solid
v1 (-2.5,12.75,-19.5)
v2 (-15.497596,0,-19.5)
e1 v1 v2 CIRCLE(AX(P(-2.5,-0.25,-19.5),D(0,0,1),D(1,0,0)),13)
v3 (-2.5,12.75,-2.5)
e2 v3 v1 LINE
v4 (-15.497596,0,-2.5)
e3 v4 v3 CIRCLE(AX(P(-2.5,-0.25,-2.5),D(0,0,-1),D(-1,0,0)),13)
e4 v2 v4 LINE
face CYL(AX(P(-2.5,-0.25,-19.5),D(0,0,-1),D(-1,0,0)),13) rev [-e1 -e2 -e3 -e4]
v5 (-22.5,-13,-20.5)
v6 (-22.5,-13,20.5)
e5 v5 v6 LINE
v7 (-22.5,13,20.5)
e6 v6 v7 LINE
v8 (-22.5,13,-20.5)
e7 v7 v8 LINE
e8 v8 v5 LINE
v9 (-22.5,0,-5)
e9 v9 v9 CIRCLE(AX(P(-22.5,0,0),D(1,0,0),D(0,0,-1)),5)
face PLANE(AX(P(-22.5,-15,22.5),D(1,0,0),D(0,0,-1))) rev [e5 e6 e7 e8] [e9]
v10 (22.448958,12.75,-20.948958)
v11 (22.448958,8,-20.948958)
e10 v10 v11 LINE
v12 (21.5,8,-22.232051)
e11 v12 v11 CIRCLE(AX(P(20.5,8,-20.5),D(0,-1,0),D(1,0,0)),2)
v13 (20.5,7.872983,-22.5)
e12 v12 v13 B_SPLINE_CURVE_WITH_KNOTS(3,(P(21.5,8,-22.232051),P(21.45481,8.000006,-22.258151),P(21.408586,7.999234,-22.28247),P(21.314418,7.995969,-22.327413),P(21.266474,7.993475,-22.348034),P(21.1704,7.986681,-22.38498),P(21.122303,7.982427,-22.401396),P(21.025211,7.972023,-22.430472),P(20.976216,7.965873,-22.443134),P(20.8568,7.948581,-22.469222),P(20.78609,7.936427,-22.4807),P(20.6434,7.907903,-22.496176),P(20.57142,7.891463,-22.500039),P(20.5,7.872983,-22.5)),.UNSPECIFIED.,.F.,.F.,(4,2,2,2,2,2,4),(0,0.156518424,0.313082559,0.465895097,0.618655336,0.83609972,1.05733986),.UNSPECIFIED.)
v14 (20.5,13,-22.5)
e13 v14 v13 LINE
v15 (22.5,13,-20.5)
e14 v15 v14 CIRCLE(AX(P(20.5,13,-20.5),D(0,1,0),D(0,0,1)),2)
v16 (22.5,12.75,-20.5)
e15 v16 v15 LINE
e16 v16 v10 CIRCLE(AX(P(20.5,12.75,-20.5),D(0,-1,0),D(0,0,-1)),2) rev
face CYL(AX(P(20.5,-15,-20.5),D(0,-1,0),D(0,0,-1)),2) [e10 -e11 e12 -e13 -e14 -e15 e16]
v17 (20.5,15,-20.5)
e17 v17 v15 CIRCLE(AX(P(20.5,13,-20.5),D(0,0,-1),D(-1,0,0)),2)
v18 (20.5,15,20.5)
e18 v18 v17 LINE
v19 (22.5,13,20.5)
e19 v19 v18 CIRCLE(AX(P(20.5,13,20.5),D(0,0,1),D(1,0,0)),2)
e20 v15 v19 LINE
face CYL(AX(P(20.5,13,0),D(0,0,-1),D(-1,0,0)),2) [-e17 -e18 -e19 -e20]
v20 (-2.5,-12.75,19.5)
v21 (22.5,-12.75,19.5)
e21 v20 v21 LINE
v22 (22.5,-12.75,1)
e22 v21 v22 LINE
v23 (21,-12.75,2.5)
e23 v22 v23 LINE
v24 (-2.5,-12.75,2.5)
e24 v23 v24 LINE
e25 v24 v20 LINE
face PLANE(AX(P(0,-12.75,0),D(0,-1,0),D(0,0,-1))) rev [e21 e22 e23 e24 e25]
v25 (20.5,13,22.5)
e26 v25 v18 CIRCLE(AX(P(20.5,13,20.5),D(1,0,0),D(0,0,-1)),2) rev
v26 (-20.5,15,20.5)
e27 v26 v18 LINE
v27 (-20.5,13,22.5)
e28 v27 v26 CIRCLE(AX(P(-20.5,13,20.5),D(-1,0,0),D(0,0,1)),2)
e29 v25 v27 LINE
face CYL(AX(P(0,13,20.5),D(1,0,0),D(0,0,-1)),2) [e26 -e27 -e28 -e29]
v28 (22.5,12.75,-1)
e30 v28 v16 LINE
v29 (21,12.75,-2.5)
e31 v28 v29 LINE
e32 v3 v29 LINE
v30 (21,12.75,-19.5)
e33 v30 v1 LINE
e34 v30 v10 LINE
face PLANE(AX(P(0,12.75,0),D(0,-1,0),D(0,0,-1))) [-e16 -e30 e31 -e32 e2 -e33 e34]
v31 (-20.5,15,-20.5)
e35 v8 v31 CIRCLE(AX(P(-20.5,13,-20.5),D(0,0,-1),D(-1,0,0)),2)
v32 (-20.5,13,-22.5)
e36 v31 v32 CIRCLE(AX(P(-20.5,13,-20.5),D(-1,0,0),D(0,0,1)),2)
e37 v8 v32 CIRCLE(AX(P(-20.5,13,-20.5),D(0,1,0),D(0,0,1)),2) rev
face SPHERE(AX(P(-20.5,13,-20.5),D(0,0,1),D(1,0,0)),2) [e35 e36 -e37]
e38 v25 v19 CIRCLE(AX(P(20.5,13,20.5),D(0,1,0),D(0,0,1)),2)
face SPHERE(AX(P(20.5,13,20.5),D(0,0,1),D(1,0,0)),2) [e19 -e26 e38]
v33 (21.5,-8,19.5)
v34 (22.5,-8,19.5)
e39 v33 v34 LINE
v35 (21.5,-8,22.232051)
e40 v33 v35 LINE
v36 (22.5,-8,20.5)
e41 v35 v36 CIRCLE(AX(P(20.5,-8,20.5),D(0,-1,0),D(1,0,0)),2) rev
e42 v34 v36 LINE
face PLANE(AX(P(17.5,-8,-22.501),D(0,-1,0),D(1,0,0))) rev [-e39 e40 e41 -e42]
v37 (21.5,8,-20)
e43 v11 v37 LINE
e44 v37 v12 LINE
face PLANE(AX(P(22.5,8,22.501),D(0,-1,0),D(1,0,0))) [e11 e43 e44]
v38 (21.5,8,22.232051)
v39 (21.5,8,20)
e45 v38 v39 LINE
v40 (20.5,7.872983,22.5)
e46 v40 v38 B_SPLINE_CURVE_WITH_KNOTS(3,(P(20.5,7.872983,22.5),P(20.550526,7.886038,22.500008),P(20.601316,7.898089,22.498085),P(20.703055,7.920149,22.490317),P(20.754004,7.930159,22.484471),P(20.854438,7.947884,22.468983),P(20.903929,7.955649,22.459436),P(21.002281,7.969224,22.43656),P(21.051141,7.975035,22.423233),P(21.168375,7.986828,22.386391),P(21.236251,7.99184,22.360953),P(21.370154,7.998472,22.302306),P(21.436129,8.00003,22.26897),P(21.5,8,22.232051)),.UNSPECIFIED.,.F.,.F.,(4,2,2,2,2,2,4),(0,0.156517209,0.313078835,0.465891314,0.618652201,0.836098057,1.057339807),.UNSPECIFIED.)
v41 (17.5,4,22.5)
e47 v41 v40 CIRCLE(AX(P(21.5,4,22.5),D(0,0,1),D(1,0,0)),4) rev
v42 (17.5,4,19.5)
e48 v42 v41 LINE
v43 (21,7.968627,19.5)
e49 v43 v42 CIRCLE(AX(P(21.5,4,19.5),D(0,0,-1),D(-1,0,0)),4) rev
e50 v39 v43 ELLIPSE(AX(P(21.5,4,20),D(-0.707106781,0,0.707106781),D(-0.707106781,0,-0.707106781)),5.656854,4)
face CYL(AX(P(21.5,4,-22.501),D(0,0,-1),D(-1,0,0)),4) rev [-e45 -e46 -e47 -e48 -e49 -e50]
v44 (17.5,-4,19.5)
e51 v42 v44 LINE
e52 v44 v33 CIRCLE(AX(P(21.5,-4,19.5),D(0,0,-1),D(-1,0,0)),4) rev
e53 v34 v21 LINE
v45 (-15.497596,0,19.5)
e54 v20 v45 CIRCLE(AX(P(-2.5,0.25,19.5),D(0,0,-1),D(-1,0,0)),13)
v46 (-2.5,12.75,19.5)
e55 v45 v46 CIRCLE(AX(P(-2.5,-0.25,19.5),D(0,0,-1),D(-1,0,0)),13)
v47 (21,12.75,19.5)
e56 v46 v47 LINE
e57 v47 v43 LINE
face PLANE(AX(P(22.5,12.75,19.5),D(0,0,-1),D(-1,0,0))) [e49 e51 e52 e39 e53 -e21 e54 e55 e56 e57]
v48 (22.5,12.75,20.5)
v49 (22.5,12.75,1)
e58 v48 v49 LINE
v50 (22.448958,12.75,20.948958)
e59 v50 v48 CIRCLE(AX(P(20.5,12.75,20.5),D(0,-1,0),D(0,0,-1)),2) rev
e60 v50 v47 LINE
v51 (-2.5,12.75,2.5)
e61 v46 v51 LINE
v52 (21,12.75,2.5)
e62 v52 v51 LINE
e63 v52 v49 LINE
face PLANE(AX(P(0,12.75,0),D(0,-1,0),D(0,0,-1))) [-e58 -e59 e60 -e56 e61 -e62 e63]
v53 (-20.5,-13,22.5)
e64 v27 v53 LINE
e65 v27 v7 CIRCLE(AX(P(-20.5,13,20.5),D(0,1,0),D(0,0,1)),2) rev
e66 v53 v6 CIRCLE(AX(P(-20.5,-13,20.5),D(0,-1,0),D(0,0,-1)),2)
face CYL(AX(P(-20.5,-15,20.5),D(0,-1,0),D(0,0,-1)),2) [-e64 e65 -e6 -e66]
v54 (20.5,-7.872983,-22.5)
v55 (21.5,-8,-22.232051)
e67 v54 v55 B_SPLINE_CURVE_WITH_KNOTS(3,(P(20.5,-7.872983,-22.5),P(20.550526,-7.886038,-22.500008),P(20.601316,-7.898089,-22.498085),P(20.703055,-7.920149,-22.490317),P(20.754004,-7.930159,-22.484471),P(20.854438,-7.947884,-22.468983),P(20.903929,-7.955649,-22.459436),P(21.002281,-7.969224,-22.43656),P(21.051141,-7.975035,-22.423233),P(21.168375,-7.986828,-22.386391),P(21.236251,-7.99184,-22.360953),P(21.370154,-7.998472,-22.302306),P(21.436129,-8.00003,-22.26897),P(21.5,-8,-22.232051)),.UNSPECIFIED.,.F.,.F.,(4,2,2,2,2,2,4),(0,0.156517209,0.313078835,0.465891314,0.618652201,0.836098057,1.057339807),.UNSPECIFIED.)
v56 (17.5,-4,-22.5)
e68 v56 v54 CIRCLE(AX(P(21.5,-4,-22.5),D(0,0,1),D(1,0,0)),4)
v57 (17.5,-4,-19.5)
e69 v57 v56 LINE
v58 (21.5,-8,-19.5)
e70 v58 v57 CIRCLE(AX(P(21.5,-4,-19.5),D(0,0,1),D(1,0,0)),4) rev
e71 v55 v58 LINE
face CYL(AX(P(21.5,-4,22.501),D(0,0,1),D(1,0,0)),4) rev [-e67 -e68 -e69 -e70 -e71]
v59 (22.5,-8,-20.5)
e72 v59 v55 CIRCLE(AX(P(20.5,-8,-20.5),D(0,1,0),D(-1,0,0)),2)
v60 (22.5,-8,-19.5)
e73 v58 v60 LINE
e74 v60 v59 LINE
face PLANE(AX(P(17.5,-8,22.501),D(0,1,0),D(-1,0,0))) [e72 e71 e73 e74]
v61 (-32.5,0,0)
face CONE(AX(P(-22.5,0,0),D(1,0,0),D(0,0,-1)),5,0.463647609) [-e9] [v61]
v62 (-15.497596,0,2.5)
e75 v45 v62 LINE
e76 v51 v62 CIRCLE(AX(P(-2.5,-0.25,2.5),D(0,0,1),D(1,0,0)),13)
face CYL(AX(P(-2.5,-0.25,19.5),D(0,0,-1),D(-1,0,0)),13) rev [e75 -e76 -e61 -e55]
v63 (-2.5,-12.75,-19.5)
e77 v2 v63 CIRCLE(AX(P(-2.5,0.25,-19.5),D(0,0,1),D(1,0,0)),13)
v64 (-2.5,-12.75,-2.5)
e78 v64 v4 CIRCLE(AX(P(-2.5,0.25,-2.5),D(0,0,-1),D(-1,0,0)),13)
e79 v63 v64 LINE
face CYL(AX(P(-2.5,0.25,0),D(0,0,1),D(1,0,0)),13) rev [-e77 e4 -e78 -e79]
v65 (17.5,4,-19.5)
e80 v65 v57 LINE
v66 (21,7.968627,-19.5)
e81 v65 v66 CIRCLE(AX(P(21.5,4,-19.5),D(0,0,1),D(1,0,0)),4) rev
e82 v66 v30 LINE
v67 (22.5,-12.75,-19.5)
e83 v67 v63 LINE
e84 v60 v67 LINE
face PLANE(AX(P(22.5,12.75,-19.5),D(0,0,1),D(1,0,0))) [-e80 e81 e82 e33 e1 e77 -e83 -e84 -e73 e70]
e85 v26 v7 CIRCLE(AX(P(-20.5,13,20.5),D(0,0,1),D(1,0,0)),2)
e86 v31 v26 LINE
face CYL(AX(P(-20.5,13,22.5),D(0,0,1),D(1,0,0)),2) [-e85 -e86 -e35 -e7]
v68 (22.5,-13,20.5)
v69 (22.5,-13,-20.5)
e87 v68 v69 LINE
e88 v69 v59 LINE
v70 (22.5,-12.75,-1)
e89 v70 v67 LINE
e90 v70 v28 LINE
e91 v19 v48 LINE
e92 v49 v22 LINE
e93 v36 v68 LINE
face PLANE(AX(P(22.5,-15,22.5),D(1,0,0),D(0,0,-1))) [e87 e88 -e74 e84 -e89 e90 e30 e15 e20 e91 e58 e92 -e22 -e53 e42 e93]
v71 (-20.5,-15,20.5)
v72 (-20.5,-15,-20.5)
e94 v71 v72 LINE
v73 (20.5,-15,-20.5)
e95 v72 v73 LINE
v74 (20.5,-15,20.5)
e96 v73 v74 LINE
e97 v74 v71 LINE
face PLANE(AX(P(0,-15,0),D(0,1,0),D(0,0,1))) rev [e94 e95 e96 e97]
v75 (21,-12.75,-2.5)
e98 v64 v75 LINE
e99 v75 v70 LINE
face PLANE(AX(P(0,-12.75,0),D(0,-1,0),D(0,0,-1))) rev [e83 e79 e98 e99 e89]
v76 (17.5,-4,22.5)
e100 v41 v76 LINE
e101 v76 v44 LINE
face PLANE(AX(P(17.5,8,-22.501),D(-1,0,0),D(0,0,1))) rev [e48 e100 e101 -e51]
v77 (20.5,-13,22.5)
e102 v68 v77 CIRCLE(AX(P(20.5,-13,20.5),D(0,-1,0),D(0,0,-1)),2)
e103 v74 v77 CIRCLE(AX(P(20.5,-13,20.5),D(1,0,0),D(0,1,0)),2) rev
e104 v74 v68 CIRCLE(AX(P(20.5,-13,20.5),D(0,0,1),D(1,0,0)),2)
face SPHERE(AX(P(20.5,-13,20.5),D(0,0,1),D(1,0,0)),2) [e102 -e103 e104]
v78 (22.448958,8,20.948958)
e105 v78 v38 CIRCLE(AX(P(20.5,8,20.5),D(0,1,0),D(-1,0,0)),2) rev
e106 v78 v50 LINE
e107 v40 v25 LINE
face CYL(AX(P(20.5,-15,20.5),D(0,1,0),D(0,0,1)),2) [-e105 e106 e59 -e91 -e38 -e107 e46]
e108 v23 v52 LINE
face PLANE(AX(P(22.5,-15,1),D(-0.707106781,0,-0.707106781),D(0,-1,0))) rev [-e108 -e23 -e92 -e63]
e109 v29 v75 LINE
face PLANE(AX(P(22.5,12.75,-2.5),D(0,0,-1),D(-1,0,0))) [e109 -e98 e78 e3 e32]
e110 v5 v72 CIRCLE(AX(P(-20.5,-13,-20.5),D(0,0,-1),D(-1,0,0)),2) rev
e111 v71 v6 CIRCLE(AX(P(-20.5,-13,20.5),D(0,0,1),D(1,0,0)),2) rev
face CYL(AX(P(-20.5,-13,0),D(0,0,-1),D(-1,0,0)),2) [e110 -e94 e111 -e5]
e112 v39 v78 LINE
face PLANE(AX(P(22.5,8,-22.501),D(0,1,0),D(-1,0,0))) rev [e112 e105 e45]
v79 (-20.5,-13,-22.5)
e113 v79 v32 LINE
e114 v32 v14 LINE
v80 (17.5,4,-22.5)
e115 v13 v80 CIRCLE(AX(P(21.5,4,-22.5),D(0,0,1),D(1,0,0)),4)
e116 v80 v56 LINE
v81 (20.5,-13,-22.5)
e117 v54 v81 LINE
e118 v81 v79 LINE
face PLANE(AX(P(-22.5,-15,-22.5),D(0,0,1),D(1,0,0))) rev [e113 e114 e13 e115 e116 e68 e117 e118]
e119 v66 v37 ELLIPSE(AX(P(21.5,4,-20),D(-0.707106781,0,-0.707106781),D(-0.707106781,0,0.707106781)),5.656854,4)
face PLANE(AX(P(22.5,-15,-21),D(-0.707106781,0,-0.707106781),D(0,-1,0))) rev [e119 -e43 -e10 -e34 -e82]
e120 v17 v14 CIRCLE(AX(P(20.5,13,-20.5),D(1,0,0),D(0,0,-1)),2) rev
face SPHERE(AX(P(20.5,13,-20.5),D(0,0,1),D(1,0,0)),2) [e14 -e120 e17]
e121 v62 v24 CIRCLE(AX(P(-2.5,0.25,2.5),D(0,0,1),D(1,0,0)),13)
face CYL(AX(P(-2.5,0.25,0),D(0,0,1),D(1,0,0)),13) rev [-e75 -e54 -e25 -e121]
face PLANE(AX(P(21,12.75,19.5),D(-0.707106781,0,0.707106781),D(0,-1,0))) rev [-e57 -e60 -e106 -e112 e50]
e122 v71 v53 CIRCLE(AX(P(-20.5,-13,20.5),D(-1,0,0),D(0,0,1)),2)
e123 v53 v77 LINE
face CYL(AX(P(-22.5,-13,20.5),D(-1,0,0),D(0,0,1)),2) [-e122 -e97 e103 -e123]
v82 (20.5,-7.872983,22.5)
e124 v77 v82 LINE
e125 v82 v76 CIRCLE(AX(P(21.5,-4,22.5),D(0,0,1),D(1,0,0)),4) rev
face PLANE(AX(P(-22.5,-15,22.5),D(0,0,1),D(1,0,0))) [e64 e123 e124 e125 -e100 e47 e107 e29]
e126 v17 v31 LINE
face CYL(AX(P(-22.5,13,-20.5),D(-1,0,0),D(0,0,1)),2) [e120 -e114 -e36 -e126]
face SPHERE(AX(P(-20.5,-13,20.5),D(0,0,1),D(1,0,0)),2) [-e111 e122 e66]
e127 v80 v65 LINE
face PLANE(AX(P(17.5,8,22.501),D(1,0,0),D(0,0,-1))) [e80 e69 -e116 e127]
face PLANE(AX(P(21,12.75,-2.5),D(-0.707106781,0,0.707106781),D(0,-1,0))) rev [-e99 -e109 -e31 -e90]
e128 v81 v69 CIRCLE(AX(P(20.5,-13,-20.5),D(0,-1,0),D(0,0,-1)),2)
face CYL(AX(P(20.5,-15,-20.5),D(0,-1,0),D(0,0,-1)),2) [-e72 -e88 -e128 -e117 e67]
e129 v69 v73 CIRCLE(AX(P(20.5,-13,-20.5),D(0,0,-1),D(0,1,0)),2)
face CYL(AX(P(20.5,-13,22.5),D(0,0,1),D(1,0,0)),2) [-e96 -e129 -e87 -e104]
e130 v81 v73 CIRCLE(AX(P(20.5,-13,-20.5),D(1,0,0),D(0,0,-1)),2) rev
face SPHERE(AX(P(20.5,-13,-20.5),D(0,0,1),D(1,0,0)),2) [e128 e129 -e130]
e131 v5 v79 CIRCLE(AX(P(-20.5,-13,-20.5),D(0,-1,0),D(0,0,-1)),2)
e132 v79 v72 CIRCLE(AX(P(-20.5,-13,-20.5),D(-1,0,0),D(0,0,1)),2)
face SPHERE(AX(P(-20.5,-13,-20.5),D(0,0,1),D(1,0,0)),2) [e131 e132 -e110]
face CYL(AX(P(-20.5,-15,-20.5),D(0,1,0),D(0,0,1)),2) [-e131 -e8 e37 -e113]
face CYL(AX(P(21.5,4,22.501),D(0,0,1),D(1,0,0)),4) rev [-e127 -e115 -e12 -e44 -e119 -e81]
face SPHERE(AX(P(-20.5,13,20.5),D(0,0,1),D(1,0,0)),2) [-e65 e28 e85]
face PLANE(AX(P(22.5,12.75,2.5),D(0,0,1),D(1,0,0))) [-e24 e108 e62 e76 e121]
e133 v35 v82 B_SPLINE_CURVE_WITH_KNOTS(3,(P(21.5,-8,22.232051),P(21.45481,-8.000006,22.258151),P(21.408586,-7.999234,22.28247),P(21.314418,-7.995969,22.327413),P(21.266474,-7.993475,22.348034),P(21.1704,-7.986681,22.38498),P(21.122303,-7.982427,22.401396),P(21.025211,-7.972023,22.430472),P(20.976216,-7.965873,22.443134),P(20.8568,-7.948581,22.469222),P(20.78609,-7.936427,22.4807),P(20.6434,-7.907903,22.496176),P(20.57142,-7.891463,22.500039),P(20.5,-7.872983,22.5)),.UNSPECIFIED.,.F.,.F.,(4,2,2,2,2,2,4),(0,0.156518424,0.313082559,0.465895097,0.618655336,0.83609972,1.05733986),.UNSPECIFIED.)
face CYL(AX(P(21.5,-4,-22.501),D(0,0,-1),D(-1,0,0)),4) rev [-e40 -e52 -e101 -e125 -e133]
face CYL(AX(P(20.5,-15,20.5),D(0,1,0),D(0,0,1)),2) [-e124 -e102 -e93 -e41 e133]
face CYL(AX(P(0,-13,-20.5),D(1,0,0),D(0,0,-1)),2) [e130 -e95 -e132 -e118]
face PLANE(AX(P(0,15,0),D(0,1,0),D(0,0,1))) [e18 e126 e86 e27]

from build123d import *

# Parameters (mm, degrees)
BOSS_EXTRUDE1_DEPTH      = 15
BOSS_EXTRUDE1_DEPTH_BACK = 15
SKETCH1_W                = 45
SKETCH1_H                = 45
CUT_EXTRUDE1_DEPTH       = 12.75
CUT_EXTRUDE1_DEPTH_BACK  = 12.75
SKETCH2_W                = 38
SKETCH2_H                = 17
FILLET1_R                = 13
CUT_EXTRUDE2_REACH       = 54.5
SKETCH5_W                = 5
SKETCH5_H                = 16
FILLET2_R                = 2
CHAMFER3_SIZE            = 1.5
FILLET3_R                = 4


with BuildPart() as part:
    # Sketch1 → Boss-Extrude1 (new, two sides: drawn at the far end of the back side and taken through both)
    with BuildSketch(Plane(origin=(0, 0, 0), x_dir=(1, 0, 0), z_dir=(0, 1, 0)).offset(-BOSS_EXTRUDE1_DEPTH_BACK)):
        Rectangle(SKETCH1_W, SKETCH1_H)
    extrude(amount=BOSS_EXTRUDE1_DEPTH + BOSS_EXTRUDE1_DEPTH_BACK)

    # Sketch2 → Cut-Extrude1 (cut, two sides: drawn at the far end of the back side and taken through both)
    with BuildSketch(Plane(origin=(0, 0, 0), x_dir=(1, 0, 0), z_dir=(0, 1, 0)).offset(-CUT_EXTRUDE1_DEPTH_BACK)):
        with Locations((3.5, 11)):
            Rectangle(SKETCH2_W, SKETCH2_H)
        with Locations((3.5, -11)):
            Rectangle(SKETCH2_W, SKETCH2_H)
    extrude(amount=CUT_EXTRUDE1_DEPTH + CUT_EXTRUDE1_DEPTH_BACK, mode=Mode.SUBTRACT)

    # Fillet1
    # the kernel refuses this fillet: 13 mm, written as the material it adds along each edge
    with BuildSketch(Plane(origin=(-15.5, -12.75, -19.5), x_dir=(1, 0, 0), z_dir=(0, 0, 1))) as fillet1_piece_1_section:
        with BuildLine():
            CenterArc((FILLET1_R, FILLET1_R), FILLET1_R, 180, 90)
            Line((0, FILLET1_R), (0, 0))
            Line((0, 0), (FILLET1_R, 0))
        make_face()
    fillet1_piece_1 = extrude(amount=49.5, mode=Mode.PRIVATE)
    fillet1_piece_1 = split(fillet1_piece_1, bisect_by=Plane(origin=(-12.596216794, -9.846216794, 19.5), z_dir=(0, 0, -1)), keep=Keep.TOP, mode=Mode.PRIVATE)
    add(fillet1_piece_1)
    with BuildSketch(Plane(origin=(-15.5, 12.75, -19.5), x_dir=(1, 0, 0), z_dir=(0, 0, 1))) as fillet1_piece_2_section:
        with BuildLine():
            CenterArc((FILLET1_R, -FILLET1_R), FILLET1_R, 90, 90)
            Line((0, -FILLET1_R), (0, 0))
            Line((0, 0), (FILLET1_R, 0))
        make_face()
    fillet1_piece_2 = extrude(amount=49.5, mode=Mode.PRIVATE)
    fillet1_piece_2 = split(fillet1_piece_2, bisect_by=Plane(origin=(-12.596216794, 9.846216794, 19.5), z_dir=(0, 0, -1)), keep=Keep.TOP, mode=Mode.PRIVATE)
    add(fillet1_piece_2)
    with BuildSketch(Plane(origin=(-15.5, 12.75, 19.5), x_dir=(1, 0, 0), z_dir=(0, 0, -1))) as fillet1_piece_3_section:
        with BuildLine():
            CenterArc((FILLET1_R, FILLET1_R), FILLET1_R, 180, 90)
            Line((0, FILLET1_R), (0, 0))
            Line((0, 0), (FILLET1_R, 0))
        make_face()
    fillet1_piece_3 = extrude(amount=49.5, mode=Mode.PRIVATE)
    fillet1_piece_3 = split(fillet1_piece_3, bisect_by=Plane(origin=(-12.596216794, 9.846216794, -19.5), z_dir=(0, 0, 1)), keep=Keep.TOP, mode=Mode.PRIVATE)
    add(fillet1_piece_3)
    with BuildSketch(Plane(origin=(-15.5, -12.75, 19.5), x_dir=(1, 0, 0), z_dir=(0, 0, -1))) as fillet1_piece_4_section:
        with BuildLine():
            CenterArc((FILLET1_R, -FILLET1_R), FILLET1_R, 90, 90)
            Line((0, -FILLET1_R), (0, 0))
            Line((0, 0), (FILLET1_R, 0))
        make_face()
    fillet1_piece_4 = extrude(amount=49.5, mode=Mode.PRIVATE)
    fillet1_piece_4 = split(fillet1_piece_4, bisect_by=Plane(origin=(-12.596216794, -9.846216794, -19.5), z_dir=(0, 0, 1)), keep=Keep.TOP, mode=Mode.PRIVATE)
    add(fillet1_piece_4)

    # Sketch5 → Cut-Extrude2 (cut, up to next)
    with BuildSketch(Plane.XY.offset(22.5), mode=Mode.PRIVATE) as cut_extrude2_sk1:
        with Locations((20, 0)):
            Rectangle(SKETCH5_W, SKETCH5_H)
    cut_extrude2_tool1 = extrude(cut_extrude2_sk1.sketch, amount=-CUT_EXTRUDE2_REACH, mode=Mode.PRIVATE) & part.part
    cut_extrude2 = cut_extrude2_tool1.solids().sort_by_distance((20, 0, 22.5))[0]
    add(cut_extrude2, mode=Mode.SUBTRACT)

    # Mirror1: Cut-Extrude2 across plane
    add(cut_extrude2.mirror(Plane.XY), mode=Mode.SUBTRACT)

    # Fillet2
    fillet2_edges = [part.edges().sort_by_distance(p)[0] for p in [
        (0, 15, -22.5),
        (-22.5, 15, 0),
        (0, 15, 22.5),
        (0, -15, -22.5),
        (22.5, 15, 0),
        (-22.5, -15, 0),
        (0, -15, 22.5),
        (22.5, 11.5, 22.5),
        (-22.5, 0, 22.5),
        (-22.5, 0, -22.5),
        (22.5, -11.5, -22.5),
        (22.5, -11.5, 22.5),
        (22.5, 11.5, -22.5),
        (22.5, -15, 0),
    ]]
    fillet(fillet2_edges, radius=FILLET2_R)

    # Sketch3 → Revolve1 (revolve)
    with BuildSketch(Plane(origin=(0, 0, 0), x_dir=(1, 0, 0), z_dir=(0, 1, 0))):
        Polygon((-22.5, 0), (-32.5, 0), (-22.5, 5), align=None)
    revolve(axis=Axis((-22.5, 0, 0), (-1, 0, 0)))

    # Chamfer3
    # the kernel refuses this chamfer: 1.5 mm, written as the material it takes off along each edge
    with BuildSketch(Plane(origin=(22.5, 12.75, -19.5), x_dir=(0.0274958766105867, 0, -0.9996219169112968), z_dir=(0, -1, 0)), Plane(origin=(22.5, 4.142475518, 19.5), x_dir=(0.027495876610586768, 0, 0.9996219169112968), z_dir=(0, 1, 0))) as chamfer3_piece_1:
        Polygon((CHAMFER3_SIZE * 0.999621916911, -CHAMFER3_SIZE * 0.0274958766106), (-CHAMFER3_SIZE * 0.0274958766106, -CHAMFER3_SIZE * 0.999621916911), (0, 0), align=None)
    extrude(amount=8.607524482, mode=Mode.SUBTRACT)
    with BuildSketch(Plane(origin=(22.5, 12.75, -2.5), x_dir=(0.027495876610577594, 0, 0.999621916911297), z_dir=(0, -1, 0))) as chamfer3_piece_2:
        Polygon((CHAMFER3_SIZE * 0.999621916911, CHAMFER3_SIZE * 0.0274958766106), (-CHAMFER3_SIZE * 0.0274958766106, CHAMFER3_SIZE * 0.999621916911), (0, 0), align=None)
    extrude(amount=25.5, mode=Mode.SUBTRACT)
    with BuildSketch(Plane(origin=(22.5, 12.75, 2.5), x_dir=(0.027495876610577594, 0, -0.999621916911297), z_dir=(0, -1, 0))) as chamfer3_piece_3:
        Polygon((CHAMFER3_SIZE * 0.999621916911, -CHAMFER3_SIZE * 0.0274958766106), (-CHAMFER3_SIZE * 0.0274958766106, -CHAMFER3_SIZE * 0.999621916911), (0, 0), align=None)
    extrude(amount=25.5, mode=Mode.SUBTRACT)

    # Fillet3
    fillet3_edges = [part.edges().sort_by_distance(p)[0] for p in [
        (17.5, -8, -21),
        (17.5, 8, -21),
        (17.5, -8, 21),
        (17.5, 8, 21),
    ]]
    fillet(fillet3_edges, radius=FILLET3_R)


solid = part.part
